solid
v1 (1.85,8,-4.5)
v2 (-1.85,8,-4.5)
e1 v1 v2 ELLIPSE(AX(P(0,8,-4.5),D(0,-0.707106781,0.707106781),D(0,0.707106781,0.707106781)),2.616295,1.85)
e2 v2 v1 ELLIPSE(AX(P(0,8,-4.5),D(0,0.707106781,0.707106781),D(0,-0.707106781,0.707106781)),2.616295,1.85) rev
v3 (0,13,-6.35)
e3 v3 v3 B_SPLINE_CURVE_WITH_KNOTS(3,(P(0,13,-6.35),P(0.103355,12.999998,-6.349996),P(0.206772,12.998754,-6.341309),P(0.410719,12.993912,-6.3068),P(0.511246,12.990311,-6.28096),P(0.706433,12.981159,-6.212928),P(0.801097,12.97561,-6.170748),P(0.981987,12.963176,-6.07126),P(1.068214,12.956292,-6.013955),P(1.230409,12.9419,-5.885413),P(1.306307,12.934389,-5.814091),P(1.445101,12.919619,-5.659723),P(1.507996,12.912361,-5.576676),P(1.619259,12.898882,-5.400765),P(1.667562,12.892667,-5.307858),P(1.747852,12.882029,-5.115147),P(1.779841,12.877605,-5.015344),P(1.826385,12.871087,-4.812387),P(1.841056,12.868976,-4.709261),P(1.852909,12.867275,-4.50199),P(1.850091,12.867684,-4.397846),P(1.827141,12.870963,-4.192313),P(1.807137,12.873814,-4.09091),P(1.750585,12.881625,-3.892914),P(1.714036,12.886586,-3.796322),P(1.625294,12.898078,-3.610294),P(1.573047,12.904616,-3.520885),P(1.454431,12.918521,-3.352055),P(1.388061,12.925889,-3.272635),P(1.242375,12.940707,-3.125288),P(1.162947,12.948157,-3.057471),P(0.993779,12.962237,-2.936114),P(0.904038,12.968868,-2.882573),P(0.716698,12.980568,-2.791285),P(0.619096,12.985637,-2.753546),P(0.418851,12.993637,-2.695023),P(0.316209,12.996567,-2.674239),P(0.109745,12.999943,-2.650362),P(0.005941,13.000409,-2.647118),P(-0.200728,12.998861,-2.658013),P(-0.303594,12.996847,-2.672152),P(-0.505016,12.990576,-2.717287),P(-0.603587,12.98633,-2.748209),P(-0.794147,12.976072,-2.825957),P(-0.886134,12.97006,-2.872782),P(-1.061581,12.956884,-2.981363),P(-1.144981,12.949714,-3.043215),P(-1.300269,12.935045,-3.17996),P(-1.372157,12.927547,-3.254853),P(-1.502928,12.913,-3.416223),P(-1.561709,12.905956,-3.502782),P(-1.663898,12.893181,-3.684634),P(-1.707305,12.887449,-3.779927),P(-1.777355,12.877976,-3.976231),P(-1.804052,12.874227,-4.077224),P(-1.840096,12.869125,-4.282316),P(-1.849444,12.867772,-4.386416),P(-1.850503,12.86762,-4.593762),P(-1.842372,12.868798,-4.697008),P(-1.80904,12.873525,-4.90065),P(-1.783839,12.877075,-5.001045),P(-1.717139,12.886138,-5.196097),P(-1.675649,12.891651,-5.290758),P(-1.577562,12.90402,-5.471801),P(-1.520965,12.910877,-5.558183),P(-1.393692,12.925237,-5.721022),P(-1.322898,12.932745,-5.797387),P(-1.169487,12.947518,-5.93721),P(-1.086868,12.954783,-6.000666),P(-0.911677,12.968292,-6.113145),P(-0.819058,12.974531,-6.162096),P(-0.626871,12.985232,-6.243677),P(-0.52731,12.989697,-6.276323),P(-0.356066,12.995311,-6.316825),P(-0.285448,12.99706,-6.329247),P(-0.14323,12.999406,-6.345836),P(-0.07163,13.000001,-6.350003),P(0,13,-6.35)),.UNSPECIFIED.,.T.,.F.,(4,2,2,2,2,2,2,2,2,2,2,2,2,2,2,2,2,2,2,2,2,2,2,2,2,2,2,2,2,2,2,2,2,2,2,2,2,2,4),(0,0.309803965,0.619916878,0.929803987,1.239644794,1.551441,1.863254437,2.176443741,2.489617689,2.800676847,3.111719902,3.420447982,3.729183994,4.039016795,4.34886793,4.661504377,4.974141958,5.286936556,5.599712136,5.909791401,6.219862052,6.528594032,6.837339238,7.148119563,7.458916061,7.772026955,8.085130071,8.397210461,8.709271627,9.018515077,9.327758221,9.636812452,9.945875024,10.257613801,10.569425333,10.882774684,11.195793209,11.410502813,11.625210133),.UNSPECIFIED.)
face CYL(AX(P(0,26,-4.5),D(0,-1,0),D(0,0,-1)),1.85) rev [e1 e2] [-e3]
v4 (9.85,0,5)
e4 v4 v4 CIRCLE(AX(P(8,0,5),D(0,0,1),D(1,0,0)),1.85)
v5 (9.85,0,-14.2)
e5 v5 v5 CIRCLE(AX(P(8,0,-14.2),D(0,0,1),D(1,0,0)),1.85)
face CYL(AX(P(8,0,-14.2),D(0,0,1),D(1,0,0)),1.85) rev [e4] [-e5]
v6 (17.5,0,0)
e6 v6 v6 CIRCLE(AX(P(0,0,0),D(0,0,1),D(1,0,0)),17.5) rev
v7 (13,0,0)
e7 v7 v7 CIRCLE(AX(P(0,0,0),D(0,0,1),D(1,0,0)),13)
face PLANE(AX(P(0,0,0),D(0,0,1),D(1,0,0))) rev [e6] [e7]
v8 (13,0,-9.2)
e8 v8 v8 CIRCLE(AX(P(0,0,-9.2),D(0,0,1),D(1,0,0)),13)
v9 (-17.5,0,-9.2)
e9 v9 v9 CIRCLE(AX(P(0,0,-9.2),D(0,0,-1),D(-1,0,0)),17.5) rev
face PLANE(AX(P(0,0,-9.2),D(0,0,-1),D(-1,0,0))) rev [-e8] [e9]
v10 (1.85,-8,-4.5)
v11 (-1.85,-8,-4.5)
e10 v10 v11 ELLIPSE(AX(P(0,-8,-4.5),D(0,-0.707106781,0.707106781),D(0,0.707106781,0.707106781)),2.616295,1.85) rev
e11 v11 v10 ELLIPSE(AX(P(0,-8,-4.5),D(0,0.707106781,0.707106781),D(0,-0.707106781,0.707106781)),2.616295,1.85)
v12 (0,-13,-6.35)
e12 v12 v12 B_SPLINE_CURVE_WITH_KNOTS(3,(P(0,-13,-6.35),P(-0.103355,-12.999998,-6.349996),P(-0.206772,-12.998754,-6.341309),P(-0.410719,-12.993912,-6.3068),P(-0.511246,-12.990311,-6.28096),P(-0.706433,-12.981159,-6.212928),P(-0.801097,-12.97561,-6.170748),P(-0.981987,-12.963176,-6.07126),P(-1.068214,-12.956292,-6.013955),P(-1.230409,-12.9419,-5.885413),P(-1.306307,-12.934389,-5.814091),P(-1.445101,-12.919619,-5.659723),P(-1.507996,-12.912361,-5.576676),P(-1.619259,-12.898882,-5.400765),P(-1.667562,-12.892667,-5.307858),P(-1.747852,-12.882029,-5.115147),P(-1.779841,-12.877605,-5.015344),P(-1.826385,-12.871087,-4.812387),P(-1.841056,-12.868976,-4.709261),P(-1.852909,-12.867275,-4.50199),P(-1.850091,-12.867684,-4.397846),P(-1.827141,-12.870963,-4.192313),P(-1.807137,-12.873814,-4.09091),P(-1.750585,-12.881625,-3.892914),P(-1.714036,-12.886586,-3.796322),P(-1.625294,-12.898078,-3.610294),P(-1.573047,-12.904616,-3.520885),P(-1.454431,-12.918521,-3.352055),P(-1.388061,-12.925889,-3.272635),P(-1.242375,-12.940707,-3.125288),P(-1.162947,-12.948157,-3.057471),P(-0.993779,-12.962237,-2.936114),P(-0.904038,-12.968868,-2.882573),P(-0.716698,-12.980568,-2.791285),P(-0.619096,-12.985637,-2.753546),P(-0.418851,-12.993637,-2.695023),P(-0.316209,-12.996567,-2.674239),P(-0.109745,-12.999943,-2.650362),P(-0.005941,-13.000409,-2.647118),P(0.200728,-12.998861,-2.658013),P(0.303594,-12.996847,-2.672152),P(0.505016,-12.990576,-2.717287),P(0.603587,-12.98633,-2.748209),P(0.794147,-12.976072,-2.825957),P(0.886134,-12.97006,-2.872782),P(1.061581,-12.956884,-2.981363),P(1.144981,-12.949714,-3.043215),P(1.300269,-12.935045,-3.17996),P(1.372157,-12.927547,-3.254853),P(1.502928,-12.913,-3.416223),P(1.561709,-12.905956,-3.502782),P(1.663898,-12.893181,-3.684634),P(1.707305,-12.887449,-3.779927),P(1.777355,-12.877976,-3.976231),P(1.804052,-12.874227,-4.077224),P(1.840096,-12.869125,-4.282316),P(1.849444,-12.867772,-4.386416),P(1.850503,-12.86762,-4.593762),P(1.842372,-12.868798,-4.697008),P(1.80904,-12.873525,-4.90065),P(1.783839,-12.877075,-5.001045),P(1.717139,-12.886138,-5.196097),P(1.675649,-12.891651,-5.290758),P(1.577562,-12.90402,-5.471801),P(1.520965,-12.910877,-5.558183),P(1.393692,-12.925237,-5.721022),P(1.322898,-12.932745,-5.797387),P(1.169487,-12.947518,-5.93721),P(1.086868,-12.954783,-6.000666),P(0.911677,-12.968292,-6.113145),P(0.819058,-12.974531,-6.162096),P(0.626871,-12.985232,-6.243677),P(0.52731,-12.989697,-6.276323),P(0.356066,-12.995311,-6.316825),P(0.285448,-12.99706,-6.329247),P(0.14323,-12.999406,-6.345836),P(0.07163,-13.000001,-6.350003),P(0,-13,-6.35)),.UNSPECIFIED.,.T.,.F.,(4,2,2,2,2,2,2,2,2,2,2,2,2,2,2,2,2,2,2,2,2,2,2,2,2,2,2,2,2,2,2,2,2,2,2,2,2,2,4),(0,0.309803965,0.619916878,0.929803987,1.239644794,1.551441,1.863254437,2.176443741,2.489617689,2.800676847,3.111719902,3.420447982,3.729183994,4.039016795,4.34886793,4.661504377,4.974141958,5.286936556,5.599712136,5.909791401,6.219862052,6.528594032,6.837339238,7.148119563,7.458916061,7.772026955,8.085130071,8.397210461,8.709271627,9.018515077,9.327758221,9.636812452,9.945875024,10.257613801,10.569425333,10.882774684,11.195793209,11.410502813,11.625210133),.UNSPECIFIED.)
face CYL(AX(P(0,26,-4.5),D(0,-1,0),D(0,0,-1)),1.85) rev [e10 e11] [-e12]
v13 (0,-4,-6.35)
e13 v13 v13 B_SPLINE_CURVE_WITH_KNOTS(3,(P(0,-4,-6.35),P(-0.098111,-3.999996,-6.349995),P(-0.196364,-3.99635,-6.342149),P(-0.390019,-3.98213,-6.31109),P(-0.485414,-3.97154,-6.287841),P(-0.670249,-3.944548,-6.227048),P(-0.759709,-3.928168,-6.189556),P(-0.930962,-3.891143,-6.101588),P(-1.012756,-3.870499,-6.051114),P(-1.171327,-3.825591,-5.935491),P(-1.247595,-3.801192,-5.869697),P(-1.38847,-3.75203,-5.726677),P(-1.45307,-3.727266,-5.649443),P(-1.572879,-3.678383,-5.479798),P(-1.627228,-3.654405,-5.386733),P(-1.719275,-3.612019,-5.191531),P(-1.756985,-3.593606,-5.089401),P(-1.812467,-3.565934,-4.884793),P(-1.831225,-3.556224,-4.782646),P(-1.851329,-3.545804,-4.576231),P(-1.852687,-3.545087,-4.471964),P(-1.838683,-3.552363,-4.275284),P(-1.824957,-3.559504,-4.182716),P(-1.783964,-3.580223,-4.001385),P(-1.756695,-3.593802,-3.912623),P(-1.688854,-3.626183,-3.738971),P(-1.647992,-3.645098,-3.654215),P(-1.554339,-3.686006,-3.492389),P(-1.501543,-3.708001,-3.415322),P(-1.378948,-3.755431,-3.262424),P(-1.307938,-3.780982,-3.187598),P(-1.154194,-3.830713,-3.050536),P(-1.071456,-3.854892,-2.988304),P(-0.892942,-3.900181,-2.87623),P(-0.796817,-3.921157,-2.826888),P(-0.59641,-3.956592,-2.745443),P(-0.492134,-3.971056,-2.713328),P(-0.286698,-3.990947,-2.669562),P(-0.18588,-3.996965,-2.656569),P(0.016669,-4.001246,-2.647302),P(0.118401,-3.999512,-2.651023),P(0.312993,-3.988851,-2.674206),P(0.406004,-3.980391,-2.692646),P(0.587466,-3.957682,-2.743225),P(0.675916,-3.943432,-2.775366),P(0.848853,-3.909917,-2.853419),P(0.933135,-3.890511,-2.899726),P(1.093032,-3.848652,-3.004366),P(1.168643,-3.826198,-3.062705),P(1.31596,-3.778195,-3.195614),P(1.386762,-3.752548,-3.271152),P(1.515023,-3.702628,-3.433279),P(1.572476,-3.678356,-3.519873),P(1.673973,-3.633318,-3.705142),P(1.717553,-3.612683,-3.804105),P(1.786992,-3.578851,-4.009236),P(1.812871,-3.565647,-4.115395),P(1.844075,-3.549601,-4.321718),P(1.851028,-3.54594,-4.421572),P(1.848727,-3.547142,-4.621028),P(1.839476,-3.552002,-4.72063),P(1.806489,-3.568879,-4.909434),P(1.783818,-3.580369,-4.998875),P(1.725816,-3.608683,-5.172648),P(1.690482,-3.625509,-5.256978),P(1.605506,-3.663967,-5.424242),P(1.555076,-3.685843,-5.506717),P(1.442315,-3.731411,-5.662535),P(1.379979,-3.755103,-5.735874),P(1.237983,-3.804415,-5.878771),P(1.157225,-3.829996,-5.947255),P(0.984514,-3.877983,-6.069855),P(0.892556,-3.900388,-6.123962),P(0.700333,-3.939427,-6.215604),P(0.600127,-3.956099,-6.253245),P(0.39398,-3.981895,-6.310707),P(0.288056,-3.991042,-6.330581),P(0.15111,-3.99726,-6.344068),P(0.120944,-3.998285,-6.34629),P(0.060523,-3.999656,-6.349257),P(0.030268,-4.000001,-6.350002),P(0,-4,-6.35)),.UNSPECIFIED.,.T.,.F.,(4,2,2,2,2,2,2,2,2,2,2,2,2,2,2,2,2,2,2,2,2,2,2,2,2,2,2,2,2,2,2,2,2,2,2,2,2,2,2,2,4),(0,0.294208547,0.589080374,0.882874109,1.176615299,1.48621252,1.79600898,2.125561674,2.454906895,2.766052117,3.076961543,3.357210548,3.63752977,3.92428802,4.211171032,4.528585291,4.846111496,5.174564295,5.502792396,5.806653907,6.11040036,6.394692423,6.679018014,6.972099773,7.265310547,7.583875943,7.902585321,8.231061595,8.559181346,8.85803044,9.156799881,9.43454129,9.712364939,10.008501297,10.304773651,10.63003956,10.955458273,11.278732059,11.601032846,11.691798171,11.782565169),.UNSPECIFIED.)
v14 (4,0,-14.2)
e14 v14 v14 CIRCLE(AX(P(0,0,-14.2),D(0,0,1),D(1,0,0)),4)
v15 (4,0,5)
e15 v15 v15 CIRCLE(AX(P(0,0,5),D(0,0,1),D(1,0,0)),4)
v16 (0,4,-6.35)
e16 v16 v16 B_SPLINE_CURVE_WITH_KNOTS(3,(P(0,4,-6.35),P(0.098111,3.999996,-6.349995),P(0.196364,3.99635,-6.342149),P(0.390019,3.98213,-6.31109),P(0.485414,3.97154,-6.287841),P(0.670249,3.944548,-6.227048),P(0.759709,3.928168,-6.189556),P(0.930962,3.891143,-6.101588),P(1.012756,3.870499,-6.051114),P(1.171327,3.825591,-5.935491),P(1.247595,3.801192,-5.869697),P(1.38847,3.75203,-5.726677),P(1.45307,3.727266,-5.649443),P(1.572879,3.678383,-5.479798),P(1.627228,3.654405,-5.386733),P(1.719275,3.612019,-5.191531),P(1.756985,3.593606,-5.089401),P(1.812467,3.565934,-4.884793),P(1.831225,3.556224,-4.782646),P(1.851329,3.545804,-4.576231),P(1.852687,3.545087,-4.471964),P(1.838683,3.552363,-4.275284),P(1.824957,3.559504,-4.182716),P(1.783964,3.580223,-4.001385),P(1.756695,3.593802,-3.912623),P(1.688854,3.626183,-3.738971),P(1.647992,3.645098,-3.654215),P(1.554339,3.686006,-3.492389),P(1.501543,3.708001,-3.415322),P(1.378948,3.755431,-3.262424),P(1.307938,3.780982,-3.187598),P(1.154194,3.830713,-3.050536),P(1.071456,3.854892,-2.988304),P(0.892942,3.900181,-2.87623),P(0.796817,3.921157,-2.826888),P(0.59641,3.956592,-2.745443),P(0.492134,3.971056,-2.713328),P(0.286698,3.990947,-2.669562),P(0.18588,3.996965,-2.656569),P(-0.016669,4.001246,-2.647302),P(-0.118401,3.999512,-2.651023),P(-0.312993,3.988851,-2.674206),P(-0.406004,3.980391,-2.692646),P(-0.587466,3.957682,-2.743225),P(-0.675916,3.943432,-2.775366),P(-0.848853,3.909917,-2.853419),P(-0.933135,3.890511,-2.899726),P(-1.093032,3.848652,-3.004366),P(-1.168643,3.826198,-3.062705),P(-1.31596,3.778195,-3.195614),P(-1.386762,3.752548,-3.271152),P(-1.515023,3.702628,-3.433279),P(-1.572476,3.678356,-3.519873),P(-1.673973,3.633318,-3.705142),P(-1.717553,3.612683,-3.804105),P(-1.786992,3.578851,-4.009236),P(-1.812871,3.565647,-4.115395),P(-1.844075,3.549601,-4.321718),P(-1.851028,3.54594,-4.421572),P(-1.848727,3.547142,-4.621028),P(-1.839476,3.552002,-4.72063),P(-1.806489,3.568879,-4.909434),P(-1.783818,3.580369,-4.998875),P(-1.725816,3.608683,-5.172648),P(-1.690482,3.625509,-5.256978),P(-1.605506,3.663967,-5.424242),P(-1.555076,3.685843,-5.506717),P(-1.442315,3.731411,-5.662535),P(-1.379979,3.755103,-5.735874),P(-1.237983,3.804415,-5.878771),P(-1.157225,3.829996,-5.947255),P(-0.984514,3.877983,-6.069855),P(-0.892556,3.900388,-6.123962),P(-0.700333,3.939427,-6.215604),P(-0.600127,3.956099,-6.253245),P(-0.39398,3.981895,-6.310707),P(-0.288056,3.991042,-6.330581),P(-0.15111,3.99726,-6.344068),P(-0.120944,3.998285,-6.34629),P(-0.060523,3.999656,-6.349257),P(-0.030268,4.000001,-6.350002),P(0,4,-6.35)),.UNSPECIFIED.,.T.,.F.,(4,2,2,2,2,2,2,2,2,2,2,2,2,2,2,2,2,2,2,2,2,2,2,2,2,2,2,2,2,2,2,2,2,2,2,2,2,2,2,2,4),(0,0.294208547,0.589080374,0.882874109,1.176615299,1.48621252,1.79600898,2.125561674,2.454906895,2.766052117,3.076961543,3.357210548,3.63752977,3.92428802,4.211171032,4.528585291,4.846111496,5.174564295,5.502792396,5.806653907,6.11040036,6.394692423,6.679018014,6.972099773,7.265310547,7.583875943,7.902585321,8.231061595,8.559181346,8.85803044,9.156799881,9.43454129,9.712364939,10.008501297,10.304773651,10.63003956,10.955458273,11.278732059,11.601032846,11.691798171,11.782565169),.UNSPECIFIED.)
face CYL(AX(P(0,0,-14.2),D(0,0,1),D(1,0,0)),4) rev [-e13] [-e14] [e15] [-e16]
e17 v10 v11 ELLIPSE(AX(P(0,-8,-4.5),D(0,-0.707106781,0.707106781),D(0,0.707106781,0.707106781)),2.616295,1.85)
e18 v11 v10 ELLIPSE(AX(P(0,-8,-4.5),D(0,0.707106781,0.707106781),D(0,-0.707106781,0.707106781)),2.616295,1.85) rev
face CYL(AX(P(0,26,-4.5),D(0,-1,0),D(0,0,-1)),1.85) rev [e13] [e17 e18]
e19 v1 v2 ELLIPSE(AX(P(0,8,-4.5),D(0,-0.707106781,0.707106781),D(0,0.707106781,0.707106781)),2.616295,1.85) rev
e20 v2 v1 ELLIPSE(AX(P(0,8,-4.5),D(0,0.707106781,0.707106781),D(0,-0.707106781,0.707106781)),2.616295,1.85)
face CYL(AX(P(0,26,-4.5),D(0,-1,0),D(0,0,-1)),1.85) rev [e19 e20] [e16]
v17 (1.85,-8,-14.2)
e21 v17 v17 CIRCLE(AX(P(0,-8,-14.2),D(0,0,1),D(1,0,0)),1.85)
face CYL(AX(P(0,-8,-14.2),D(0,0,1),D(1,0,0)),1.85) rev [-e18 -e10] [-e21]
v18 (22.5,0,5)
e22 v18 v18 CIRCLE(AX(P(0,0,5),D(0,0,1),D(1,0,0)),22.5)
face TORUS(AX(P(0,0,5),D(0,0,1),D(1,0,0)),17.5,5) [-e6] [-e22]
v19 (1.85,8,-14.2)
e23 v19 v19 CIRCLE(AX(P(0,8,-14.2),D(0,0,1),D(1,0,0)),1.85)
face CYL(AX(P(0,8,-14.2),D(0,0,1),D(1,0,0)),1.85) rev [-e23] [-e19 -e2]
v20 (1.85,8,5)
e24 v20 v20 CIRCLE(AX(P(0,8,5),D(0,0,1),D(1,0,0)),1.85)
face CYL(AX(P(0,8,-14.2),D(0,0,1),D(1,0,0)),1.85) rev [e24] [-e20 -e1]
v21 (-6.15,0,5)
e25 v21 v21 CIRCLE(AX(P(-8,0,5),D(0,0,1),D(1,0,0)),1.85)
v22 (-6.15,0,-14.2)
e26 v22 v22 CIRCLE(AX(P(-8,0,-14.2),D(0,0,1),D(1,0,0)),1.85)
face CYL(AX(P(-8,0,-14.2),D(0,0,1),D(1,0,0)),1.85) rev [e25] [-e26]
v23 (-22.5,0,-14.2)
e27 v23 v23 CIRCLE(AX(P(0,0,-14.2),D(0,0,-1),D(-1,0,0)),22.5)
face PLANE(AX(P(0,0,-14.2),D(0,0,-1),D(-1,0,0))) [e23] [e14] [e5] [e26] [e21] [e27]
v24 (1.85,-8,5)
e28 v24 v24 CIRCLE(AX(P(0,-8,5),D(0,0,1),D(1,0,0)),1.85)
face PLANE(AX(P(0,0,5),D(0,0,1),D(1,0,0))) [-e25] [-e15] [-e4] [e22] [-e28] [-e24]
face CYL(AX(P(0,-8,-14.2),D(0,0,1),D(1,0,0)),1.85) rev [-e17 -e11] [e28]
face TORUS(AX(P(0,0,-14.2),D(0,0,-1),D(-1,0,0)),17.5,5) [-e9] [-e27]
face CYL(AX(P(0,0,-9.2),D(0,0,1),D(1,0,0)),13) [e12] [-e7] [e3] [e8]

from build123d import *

# Parameters (mm, degrees)
SKETCH1_R               = 22.5
BOSS_EXTRUDE1_DEPTH     = 5
SKETCH2_R               = 13
BOSS_EXTRUDE2_DEPTH     = 9.2
BOSS_EXTRUDE4_START     = 5
SKETCH5_R               = 22.5
BOSS_EXTRUDE4_DEPTH     = 5
SKETCH6_R               = 4
SKETCH6_R_2             = 1.85
CUT_EXTRUDE1_DEPTH      = 38.163691959
FILLET1_R               = 5
CUT_EXTRUDE2_DEPTH      = 26
CUT_EXTRUDE2_DEPTH_BACK = 26
SKETCH8_R               = 1.85


with BuildPart() as part:
    # Sketch1 → Boss-Extrude1 (new body)
    with BuildSketch(Plane.XY):
        Circle(SKETCH1_R)
    extrude(amount=BOSS_EXTRUDE1_DEPTH)

    # Sketch2 → Boss-Extrude2 (add)
    with BuildSketch(Plane.XY):
        Circle(SKETCH2_R)
    extrude(amount=-BOSS_EXTRUDE2_DEPTH)

    # Sketch5 → Boss-Extrude4 (add)
    with BuildSketch(Plane(origin=(0, 0, -9.2), x_dir=(-1, 0, 0), z_dir=(0, 0, -1)).offset(BOSS_EXTRUDE4_START)):
        with Locations(Location((0, 0, 0), (0, 0, 180))):
            Circle(SKETCH5_R)
    extrude(amount=-BOSS_EXTRUDE4_DEPTH)

    # Sketch6 → Cut-Extrude1 (cut, through all)
    with BuildSketch(Plane.XY.offset(5)):
        Circle(SKETCH6_R)
        with Locations((0, 8)):
            Circle(SKETCH6_R_2)
        with Locations((8, 0)):
            Circle(SKETCH6_R_2)
        with Locations((0, -8)):
            Circle(SKETCH6_R_2)
        with Locations((-8, 0)):
            Circle(SKETCH6_R_2)
    extrude(amount=-CUT_EXTRUDE1_DEPTH, mode=Mode.SUBTRACT)

    # Fillet1
    fillet1_edges = [part.edges().sort_by_distance(p)[0] for p in [
        (-22.5, 0, 0),
        (-22.5, 0, -9.2),
    ]]
    fillet(fillet1_edges, radius=FILLET1_R - 0.0001)  # a hair under: the kernel refuses the full size

    # Sketch8 → Cut-Extrude2 (cut, two sides: drawn at the far end of the back side and taken through both)
    with BuildSketch(Plane(origin=(0, 0, 0), x_dir=(1, 0, 0), z_dir=(0, 1, 0)).offset(-CUT_EXTRUDE2_DEPTH_BACK)):
        with Locations(Location((0, 4.5, 0), (0, 0, 90))):
            Circle(SKETCH8_R)
    extrude(amount=CUT_EXTRUDE2_DEPTH + CUT_EXTRUDE2_DEPTH_BACK, mode=Mode.SUBTRACT)


solid = part.part
